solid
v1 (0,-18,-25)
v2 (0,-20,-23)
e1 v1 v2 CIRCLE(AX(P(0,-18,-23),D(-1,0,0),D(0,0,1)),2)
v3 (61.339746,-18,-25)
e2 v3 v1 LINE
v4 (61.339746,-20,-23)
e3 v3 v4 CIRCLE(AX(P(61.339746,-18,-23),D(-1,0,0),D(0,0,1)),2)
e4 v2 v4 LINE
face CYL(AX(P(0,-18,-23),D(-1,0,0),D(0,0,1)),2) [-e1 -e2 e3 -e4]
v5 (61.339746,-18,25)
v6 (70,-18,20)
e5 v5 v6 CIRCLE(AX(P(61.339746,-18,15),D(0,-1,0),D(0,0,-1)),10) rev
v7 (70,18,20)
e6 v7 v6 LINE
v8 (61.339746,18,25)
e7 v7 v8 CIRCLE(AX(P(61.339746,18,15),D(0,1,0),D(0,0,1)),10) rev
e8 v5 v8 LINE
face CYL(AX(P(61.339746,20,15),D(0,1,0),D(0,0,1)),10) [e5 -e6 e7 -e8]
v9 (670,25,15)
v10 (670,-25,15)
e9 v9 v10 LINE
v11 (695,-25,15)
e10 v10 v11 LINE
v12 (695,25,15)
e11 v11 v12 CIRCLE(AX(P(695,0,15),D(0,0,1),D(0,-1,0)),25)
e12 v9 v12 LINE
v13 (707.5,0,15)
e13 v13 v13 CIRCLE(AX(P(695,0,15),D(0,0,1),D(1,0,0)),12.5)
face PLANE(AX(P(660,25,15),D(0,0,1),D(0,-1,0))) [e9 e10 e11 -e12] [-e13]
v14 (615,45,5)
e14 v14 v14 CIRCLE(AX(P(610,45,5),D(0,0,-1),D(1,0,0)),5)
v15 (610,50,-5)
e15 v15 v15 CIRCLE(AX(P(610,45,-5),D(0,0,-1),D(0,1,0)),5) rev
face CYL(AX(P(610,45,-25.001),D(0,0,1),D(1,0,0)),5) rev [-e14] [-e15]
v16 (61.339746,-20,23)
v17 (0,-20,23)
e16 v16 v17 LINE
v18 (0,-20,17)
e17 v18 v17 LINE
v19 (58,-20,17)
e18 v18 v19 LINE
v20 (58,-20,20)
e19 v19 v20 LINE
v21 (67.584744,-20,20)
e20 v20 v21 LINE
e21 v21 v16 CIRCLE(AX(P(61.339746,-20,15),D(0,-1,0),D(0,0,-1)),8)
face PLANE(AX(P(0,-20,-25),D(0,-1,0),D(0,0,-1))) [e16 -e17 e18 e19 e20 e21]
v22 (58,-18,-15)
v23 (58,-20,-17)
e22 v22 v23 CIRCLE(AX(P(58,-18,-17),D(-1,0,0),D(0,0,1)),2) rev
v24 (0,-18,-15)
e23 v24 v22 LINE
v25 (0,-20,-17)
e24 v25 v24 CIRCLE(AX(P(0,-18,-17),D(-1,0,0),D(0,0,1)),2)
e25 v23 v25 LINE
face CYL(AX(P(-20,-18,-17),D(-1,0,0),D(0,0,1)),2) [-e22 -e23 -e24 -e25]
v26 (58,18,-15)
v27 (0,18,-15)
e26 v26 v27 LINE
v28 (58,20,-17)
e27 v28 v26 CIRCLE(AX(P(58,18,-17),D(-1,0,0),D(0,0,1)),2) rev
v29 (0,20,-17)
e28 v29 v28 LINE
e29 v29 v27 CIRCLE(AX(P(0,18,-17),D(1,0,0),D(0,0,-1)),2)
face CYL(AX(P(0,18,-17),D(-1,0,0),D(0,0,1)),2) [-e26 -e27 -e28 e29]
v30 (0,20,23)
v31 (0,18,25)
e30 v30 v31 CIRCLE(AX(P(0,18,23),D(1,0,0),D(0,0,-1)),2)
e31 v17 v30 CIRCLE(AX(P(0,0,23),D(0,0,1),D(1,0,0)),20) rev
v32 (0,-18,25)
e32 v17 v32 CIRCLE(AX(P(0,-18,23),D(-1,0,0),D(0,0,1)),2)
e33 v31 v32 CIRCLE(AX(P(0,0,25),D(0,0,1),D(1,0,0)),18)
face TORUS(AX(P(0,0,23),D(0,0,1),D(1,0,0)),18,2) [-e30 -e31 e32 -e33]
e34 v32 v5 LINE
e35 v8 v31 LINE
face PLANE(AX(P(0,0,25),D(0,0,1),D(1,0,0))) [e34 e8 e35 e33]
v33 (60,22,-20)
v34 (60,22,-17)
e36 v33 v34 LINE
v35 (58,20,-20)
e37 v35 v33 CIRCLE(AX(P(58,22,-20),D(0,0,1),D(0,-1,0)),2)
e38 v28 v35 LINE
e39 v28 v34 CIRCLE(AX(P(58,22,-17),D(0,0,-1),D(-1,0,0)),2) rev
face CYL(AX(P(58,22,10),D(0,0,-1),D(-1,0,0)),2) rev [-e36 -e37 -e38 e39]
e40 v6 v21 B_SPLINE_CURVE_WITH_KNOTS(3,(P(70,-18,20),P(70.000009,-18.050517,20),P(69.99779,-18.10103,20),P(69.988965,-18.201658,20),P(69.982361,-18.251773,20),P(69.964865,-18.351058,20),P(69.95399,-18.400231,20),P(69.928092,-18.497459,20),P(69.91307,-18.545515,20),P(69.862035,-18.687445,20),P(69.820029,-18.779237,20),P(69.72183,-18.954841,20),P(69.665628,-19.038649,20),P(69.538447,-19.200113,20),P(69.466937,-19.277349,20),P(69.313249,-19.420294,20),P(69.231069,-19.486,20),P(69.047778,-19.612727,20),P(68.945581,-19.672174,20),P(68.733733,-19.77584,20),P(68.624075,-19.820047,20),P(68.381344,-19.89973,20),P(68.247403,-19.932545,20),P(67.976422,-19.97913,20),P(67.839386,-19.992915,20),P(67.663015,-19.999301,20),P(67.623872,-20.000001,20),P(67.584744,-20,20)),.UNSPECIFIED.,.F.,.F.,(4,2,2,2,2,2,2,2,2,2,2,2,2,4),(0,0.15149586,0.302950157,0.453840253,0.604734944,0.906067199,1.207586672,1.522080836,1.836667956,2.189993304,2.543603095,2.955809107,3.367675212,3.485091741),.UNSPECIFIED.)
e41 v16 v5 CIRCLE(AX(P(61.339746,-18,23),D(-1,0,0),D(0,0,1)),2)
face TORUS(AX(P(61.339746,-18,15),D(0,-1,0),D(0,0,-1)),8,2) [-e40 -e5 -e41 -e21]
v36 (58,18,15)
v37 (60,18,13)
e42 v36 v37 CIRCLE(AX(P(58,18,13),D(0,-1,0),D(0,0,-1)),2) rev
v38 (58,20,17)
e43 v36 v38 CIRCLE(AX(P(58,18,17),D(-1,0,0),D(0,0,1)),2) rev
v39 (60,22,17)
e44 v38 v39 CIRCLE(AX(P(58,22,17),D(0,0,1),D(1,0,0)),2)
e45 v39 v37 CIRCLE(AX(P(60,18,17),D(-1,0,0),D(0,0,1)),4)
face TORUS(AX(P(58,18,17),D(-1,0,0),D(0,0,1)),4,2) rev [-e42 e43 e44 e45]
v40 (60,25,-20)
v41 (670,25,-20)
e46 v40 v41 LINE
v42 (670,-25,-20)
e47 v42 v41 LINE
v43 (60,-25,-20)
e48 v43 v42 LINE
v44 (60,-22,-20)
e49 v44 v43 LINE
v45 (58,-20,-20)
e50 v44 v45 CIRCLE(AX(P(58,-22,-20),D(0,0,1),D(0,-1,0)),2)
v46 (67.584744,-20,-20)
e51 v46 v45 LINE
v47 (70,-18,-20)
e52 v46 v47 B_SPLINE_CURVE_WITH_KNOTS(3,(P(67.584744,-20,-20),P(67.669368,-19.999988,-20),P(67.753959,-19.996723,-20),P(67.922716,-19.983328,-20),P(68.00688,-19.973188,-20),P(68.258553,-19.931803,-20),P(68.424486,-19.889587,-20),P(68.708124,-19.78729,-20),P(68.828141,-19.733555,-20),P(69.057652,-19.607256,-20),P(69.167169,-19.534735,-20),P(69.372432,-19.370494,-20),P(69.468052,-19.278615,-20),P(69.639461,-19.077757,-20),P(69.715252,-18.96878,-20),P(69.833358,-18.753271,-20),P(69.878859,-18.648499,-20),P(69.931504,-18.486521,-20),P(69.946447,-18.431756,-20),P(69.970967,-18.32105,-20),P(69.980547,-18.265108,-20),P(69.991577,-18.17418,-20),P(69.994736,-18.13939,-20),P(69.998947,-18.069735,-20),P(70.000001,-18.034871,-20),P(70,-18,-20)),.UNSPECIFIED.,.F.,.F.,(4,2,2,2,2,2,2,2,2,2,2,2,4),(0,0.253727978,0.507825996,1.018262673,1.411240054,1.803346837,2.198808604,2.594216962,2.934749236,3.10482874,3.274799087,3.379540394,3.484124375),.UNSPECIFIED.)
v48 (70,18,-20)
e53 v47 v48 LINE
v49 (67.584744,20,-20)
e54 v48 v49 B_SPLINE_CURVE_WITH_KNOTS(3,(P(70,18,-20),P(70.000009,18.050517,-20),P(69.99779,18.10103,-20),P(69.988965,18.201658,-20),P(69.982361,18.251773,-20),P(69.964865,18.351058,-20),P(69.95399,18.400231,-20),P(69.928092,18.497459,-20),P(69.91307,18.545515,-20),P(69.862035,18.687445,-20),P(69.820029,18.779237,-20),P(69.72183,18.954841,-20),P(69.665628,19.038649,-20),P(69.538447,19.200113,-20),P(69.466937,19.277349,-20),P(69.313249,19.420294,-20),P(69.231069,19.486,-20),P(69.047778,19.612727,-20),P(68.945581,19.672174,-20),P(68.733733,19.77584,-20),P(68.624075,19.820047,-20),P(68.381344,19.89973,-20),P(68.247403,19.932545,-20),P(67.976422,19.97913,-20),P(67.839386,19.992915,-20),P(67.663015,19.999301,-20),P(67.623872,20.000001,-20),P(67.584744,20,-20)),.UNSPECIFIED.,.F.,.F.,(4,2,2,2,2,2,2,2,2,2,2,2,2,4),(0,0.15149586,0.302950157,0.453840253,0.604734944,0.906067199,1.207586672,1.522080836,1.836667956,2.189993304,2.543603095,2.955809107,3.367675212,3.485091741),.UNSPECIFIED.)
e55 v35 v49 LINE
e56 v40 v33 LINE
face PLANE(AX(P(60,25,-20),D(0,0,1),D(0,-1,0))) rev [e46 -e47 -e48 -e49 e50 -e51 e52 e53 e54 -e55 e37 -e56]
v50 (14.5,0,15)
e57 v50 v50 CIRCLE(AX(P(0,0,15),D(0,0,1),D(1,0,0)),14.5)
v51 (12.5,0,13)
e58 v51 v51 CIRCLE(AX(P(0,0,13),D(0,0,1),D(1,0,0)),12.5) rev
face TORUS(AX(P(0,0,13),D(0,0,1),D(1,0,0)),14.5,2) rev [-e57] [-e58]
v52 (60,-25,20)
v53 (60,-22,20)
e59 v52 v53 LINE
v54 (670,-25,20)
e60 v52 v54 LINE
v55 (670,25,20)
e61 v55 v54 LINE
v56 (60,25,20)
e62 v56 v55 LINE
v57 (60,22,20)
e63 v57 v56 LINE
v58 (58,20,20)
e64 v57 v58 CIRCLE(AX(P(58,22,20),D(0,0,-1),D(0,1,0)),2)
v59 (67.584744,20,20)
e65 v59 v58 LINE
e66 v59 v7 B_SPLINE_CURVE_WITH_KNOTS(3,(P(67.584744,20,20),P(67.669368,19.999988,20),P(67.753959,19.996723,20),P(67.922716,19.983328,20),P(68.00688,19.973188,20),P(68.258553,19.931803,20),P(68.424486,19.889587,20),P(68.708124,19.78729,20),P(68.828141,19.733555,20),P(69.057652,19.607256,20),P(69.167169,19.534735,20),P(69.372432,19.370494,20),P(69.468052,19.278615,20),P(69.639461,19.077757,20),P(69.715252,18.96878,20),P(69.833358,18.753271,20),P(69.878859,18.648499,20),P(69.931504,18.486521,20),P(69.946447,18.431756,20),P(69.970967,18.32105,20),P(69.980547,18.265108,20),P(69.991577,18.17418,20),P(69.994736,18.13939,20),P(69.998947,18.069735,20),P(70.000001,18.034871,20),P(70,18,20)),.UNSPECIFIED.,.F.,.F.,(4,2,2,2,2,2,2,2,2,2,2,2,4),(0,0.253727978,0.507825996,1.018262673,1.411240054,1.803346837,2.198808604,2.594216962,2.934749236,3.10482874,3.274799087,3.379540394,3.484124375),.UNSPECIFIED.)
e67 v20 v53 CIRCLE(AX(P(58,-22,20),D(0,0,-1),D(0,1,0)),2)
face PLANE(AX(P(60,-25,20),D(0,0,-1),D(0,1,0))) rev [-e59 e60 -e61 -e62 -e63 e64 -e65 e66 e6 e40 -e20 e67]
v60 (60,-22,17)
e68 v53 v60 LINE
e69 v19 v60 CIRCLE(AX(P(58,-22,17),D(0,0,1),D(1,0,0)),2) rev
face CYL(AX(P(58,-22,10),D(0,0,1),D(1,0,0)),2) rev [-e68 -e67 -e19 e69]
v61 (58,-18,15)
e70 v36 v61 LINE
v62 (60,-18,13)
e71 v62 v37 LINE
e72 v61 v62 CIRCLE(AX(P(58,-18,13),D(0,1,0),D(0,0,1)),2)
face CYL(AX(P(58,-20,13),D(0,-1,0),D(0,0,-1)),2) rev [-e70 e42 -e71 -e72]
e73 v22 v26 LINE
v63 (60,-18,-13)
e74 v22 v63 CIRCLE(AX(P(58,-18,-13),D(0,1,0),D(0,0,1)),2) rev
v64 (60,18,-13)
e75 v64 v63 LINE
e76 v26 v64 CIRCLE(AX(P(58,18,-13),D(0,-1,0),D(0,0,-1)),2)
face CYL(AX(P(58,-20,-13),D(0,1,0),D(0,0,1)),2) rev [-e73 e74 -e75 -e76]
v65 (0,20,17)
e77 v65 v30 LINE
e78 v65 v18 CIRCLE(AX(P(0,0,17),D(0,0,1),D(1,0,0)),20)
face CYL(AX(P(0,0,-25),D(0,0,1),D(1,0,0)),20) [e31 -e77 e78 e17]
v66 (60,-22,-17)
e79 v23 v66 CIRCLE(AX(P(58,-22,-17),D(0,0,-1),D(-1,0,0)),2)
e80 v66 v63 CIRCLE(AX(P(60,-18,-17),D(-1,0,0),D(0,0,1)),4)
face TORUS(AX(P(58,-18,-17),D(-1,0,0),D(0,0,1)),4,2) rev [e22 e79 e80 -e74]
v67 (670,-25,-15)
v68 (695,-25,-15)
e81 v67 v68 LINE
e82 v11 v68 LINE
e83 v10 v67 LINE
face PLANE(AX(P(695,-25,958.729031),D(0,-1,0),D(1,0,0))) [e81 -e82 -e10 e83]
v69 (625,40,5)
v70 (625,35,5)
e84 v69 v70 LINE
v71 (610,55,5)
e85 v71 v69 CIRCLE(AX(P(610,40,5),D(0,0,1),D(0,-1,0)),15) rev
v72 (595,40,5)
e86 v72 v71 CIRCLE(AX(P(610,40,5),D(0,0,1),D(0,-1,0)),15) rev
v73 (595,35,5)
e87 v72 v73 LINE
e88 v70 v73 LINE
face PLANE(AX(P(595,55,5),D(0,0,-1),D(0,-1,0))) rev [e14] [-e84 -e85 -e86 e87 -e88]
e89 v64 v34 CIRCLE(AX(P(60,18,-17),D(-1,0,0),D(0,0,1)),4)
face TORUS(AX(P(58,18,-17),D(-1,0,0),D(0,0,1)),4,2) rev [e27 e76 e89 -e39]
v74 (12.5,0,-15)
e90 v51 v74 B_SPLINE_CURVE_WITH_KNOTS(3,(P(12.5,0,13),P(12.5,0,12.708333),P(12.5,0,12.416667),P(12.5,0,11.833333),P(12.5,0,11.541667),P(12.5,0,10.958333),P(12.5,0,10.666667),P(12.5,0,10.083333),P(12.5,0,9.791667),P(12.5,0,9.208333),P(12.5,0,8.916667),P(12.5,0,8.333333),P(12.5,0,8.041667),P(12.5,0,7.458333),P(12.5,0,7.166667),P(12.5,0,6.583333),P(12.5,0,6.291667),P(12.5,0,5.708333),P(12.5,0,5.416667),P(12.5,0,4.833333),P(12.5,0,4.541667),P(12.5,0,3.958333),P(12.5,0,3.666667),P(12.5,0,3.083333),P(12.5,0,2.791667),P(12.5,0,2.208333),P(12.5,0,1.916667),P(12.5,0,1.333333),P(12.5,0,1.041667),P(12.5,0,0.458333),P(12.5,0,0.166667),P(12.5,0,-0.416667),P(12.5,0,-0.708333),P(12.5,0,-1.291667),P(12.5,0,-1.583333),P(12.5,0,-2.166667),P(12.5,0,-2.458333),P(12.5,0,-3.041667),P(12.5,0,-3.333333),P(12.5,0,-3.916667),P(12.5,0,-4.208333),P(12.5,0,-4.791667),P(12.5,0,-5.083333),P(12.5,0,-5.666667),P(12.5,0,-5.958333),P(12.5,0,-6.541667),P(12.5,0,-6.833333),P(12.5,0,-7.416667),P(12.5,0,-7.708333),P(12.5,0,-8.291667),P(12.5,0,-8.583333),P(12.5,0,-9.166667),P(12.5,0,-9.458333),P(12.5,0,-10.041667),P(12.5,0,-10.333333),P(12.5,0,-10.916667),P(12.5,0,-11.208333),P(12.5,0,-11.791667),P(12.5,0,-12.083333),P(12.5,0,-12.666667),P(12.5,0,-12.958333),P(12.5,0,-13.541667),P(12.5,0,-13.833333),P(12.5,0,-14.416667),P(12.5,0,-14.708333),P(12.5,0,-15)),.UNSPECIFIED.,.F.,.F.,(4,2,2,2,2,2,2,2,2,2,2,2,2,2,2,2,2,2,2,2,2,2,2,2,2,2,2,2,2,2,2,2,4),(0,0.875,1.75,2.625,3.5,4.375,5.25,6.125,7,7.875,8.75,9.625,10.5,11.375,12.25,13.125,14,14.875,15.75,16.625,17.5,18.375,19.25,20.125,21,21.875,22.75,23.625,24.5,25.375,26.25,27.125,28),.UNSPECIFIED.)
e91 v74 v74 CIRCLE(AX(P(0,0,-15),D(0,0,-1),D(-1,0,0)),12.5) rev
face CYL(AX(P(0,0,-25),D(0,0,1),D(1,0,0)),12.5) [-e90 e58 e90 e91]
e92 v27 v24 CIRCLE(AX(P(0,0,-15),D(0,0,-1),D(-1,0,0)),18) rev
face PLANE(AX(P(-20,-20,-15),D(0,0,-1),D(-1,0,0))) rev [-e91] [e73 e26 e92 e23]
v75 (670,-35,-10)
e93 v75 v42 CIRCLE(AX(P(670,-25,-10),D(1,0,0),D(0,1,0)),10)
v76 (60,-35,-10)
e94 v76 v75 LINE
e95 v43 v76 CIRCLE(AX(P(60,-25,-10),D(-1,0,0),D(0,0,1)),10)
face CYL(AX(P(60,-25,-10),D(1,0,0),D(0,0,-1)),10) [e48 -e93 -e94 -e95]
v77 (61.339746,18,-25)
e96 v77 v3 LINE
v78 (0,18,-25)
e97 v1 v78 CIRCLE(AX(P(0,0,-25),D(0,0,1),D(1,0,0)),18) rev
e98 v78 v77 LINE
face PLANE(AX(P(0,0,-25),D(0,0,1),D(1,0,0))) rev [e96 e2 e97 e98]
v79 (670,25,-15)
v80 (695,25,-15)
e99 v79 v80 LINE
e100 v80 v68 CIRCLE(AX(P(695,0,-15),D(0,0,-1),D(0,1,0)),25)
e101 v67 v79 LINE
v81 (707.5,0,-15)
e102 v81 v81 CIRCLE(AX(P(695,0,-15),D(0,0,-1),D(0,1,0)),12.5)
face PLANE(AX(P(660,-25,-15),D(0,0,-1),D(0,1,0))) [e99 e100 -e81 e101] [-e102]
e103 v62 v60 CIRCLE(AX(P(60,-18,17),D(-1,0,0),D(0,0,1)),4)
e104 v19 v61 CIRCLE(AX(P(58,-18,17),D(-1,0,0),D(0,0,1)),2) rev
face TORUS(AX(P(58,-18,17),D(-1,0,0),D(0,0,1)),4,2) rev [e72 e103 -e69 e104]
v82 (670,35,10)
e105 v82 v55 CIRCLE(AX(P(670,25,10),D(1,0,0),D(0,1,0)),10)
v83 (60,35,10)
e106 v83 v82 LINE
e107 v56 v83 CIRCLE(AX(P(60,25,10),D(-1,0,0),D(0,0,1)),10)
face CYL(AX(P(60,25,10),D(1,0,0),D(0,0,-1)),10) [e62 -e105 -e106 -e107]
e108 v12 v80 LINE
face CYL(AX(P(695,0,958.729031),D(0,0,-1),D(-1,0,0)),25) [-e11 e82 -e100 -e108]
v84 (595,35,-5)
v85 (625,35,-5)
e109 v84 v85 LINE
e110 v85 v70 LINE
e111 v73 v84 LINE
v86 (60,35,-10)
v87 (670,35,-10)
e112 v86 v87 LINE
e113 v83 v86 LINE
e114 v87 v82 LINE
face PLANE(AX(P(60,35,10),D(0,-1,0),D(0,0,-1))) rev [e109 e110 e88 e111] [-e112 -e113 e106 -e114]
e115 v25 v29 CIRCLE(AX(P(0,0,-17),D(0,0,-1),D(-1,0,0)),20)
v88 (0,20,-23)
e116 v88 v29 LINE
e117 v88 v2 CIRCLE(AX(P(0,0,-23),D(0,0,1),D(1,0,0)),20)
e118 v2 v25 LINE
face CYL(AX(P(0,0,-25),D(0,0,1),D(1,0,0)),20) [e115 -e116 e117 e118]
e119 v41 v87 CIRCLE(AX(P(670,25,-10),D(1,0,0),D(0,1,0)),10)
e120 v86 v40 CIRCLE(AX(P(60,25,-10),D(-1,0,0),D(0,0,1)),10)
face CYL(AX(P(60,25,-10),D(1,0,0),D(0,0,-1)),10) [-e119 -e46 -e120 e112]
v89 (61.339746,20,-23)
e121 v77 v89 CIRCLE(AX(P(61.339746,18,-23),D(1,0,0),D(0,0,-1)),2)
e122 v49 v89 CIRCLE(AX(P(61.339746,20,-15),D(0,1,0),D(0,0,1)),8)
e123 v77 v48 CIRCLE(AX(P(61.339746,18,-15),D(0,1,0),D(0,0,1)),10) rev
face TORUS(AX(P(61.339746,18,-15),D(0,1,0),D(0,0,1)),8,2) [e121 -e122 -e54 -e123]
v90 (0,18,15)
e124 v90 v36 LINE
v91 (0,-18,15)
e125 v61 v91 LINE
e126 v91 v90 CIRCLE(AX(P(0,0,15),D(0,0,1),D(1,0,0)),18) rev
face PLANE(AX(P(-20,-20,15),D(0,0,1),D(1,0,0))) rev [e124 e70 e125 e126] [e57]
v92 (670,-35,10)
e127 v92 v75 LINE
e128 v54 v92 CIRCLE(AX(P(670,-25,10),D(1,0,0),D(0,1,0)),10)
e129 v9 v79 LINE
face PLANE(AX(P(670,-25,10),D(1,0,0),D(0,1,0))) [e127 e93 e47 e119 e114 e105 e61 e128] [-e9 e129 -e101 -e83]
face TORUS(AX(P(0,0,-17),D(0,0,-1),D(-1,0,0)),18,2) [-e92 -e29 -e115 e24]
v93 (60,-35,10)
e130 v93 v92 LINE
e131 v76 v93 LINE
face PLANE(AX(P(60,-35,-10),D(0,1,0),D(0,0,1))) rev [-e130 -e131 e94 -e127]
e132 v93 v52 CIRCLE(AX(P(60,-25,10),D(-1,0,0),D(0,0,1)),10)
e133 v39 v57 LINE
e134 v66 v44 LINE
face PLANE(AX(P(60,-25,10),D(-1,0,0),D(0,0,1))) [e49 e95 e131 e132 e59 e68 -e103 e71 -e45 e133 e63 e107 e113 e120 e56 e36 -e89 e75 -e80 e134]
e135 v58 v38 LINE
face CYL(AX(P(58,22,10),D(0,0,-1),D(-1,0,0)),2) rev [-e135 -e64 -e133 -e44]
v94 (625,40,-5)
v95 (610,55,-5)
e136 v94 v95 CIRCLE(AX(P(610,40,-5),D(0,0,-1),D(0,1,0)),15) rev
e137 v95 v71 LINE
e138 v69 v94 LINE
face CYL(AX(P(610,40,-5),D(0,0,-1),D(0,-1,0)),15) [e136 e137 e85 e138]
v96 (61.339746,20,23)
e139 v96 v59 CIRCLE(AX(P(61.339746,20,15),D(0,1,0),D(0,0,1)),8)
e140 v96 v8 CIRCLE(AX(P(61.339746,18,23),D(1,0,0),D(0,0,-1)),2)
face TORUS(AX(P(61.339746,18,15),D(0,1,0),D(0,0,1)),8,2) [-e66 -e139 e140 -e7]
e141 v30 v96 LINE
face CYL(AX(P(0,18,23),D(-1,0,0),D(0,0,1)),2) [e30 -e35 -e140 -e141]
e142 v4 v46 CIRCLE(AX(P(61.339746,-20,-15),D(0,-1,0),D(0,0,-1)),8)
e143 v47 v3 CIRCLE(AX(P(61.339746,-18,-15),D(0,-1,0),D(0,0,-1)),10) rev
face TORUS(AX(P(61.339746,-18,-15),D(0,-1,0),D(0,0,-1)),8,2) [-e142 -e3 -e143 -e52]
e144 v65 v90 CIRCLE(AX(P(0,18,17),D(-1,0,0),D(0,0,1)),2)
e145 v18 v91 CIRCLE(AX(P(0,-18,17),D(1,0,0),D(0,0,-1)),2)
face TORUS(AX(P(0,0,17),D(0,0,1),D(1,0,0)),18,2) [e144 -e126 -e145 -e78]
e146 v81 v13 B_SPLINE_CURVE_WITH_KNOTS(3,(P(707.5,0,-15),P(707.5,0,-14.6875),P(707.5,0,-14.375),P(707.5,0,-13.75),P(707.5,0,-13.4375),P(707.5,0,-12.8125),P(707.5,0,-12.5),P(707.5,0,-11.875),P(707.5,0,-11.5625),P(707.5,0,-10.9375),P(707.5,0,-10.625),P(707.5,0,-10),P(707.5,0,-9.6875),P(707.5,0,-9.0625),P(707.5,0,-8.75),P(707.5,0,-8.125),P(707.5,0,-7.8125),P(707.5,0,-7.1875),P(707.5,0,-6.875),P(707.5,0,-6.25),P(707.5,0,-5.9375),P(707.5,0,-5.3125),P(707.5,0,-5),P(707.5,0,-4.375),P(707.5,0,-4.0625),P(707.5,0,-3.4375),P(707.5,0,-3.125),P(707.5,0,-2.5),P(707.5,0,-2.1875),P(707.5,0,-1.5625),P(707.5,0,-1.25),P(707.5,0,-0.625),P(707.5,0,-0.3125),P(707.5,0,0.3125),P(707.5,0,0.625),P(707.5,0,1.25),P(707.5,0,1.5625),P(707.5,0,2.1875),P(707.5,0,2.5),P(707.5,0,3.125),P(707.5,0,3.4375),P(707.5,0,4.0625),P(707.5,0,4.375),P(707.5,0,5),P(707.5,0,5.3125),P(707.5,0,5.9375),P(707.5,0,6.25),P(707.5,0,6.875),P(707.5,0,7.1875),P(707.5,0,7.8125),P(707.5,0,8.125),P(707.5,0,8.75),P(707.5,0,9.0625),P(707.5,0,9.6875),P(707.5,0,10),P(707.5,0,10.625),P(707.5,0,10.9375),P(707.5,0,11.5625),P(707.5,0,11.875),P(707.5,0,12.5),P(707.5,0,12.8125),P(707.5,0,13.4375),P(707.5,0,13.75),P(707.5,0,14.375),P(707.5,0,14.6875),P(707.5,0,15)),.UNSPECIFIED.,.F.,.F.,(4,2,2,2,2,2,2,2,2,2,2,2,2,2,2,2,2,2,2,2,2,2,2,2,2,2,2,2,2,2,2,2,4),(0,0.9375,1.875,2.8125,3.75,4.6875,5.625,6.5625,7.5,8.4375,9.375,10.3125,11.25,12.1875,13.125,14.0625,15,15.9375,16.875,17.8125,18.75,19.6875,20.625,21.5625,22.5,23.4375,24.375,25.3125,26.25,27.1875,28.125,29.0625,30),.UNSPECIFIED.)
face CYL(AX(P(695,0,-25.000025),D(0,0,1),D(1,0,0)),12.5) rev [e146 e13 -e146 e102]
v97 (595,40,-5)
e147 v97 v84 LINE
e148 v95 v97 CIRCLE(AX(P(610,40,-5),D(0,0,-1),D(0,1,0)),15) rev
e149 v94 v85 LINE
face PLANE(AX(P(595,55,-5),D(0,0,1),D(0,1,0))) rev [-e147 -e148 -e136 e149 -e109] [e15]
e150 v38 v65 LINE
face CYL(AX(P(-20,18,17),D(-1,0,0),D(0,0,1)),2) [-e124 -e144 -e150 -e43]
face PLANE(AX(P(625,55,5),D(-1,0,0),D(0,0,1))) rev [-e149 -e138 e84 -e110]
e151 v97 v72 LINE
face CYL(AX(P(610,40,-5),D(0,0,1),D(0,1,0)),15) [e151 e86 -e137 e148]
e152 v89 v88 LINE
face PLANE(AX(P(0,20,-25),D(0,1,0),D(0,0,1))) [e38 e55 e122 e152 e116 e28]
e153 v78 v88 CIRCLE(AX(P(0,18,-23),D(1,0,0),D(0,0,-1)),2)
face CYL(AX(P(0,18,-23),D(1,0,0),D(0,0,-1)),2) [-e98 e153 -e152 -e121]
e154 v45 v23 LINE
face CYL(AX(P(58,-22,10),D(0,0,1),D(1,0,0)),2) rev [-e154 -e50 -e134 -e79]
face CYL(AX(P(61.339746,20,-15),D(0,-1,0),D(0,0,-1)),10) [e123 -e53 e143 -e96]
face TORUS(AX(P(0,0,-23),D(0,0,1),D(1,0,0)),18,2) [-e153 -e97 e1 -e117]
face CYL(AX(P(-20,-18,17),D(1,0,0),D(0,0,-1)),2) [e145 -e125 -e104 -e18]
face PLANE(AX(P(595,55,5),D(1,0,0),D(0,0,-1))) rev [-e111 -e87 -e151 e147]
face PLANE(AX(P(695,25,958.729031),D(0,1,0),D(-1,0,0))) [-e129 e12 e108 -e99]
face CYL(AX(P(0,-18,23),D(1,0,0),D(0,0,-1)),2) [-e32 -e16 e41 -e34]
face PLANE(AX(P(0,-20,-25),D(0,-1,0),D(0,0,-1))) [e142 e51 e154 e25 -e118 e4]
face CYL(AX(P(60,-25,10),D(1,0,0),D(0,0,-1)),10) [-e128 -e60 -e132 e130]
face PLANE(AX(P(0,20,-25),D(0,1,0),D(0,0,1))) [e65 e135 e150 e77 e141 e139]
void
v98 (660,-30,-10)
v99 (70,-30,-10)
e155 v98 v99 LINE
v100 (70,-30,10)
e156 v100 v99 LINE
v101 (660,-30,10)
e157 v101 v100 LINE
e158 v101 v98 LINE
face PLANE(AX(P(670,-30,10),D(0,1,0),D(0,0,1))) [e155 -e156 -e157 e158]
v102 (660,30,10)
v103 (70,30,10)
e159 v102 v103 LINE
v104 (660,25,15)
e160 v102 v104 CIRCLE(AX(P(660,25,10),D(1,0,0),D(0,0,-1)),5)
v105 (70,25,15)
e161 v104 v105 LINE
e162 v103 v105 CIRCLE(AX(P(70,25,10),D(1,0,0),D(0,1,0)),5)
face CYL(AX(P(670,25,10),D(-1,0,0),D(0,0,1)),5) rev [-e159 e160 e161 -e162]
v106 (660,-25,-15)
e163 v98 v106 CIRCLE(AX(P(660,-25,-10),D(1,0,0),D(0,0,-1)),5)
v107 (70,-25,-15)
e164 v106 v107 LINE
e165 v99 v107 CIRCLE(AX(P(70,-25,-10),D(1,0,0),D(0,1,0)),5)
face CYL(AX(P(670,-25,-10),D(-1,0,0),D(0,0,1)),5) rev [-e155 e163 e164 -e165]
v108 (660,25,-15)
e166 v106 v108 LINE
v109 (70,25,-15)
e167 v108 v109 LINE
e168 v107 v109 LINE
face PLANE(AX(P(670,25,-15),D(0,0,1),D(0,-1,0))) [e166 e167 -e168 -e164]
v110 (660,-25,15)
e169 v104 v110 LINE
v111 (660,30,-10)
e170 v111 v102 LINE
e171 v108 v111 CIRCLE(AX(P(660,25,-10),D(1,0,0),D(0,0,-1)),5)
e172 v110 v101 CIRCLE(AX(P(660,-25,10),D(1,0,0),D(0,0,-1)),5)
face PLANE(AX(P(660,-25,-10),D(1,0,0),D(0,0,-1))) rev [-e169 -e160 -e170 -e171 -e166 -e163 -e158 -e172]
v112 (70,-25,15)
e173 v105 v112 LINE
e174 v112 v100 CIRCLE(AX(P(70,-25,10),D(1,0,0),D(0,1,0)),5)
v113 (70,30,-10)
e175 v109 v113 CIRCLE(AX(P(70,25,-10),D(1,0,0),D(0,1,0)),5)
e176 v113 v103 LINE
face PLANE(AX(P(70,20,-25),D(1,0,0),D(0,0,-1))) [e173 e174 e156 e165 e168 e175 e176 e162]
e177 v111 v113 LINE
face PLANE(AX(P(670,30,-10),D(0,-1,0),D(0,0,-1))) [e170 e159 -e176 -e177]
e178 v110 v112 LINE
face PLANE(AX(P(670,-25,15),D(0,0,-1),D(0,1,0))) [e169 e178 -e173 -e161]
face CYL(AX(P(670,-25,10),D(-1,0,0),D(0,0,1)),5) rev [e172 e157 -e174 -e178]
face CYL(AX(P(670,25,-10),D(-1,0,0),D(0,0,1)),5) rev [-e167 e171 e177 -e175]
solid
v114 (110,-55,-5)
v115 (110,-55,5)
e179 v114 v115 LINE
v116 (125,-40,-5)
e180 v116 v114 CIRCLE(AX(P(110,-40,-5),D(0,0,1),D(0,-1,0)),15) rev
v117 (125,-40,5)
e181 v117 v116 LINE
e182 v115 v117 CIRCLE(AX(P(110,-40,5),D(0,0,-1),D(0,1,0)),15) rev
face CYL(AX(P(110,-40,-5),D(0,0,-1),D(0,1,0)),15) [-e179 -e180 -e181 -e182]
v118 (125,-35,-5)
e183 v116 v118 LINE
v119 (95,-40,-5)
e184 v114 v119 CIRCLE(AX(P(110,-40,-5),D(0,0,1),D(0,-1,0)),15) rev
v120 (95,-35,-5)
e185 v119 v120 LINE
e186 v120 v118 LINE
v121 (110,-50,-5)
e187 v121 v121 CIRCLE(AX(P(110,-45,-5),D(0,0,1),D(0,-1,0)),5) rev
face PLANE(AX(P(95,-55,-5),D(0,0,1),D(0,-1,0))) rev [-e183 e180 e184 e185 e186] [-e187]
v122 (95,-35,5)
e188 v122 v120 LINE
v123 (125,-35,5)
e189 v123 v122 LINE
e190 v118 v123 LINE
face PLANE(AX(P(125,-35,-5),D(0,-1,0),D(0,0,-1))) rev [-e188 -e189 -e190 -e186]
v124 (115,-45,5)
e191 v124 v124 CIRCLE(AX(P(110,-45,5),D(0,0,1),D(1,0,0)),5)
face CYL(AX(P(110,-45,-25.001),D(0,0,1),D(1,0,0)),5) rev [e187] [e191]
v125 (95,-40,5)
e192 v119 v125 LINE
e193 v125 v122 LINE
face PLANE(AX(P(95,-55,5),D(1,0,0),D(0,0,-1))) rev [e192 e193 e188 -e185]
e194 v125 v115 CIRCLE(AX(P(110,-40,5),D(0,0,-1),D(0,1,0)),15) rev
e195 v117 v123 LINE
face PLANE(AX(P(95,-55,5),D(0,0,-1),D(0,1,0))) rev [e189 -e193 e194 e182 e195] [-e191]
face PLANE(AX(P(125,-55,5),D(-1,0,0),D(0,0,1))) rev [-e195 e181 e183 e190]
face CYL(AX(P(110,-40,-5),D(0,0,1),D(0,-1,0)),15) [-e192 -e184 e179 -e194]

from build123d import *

# Parameters (mm, degrees)
BOSS_EXTRUDE1_DEPTH      = 25
BOSS_EXTRUDE1_DEPTH_BACK = 25
SKETCH2_W                = 30
SKETCH2_H                = 40
CUT_EXTRUDE1_DEPTH       = 96.524865873
BOSS_EXTRUDE2_REACH      = 90.318
SKETCH3_R                = 12.5
STRUCTURAL_MEMBER1_DEPTH = 600
BOSS_EXTRUDE3_DEPTH      = 10
BOSS_EXTRUDE4_DEPTH      = 50
BOSS_EXTRUDE4_DEPTH_BACK = 10
CUT_EXTRUDE6_START       = -30
CUT_EXTRUDE6_DEPTH       = 30
SKETCH16_R               = 12.5
CUT_EXTRUDE7_DEPTH       = 722.959140118
FILLET1_R                = 10
FILLET2_R                = 2
FILLET3_R                = 2
SKETCH19_W               = 30
SKETCH19_H               = 10
BOSS_EXTRUDE6_DEPTH      = 20
FILLET5_R                = 15
SKETCH20_R               = 5
CUT_EXTRUDE9_DEPTH       = 10
LPATTERN1_COUNT          = 2
LPATTERN1_PITCH          = 500
FILLET5_OF_LPATTERN1_R   = 15
MIRROR1_START            = -5
MIRROR1_OUTLINE_R        = 5
MIRROR1_DEPTH            = 10
CUT_EXTRUDE10_START      = -25
CUT_EXTRUDE10_OUTLINE_R  = 5
CUT_EXTRUDE10_DEPTH      = 10
CUT_EXTRUDE11_DEPTH      = 724.498445063
CUT_EXTRUDE11_DEPTH_BACK = 724.498445063


# Read off the part's stored shape, not the designer's step: Cut-Extrude6, Mirror1, Cut-Extrude10
# Some blends are built 0.0001 mm under size
with BuildPart() as part:
    # Sketch1 → Boss-Extrude1 (new, two sides: drawn at the far end of the back side and taken through both)
    with BuildSketch(Plane.XY.offset(-BOSS_EXTRUDE1_DEPTH_BACK)):
        with BuildLine():
            Line((0, 20), (70, 20))
            Line((70, 20), (70, -20))
            Line((70, -20), (0, -20))
            ThreePointArc((0, -20), (-20, 0), (0, 20))
        make_face()
    extrude(amount=BOSS_EXTRUDE1_DEPTH + BOSS_EXTRUDE1_DEPTH_BACK)

    # Sketch2 → Cut-Extrude1 (cut, through all)
    with BuildSketch(Plane(origin=(70, 0, 0), x_dir=(0, 0, -1), z_dir=(1, 0, 0))):
        Rectangle(SKETCH2_W, SKETCH2_H)
    extrude(amount=-CUT_EXTRUDE1_DEPTH, mode=Mode.SUBTRACT)


with BuildPart() as cut_extrude1_piece_1:
    # of the separate pieces the step leaves, piece 1, a body of its own (cut_extrude1_pieces)
    add(part.part.solids().sort_by_distance((0, 20, -25))[0])

    # Sketch3 → Boss-Extrude2 (add, up to next)
    with BuildSketch(Plane.XY.offset(25), mode=Mode.PRIVATE) as boss_extrude2_sk1:
        Circle(SKETCH3_R)
    boss_extrude2_tool1 = extrude(boss_extrude2_sk1.sketch, amount=-BOSS_EXTRUDE2_REACH, mode=Mode.PRIVATE) - cut_extrude1_piece_1.part


with BuildPart() as cut_extrude1_piece_2:
    # of the separate pieces the step leaves, piece 2, a body of its own (cut_extrude1_pieces)
    add(part.part.solids().sort_by_distance((0, 20, 15))[0])


with BuildPart() as cut_extrude1_piece_1_1:
    add(cut_extrude1_piece_1.part)

    add(cut_extrude1_piece_2.part)  # Boss-Extrude2 merges Cut-Extrude1 piece 2
    add(boss_extrude2_tool1.solids().sort_by_distance((0, 0, 25))[0])



with BuildPart() as body_2:
    # Sketch11 → Structural Member1 (new body)
    with BuildSketch(Plane(origin=(70, 0, 0), x_dir=(0, 0, 1), z_dir=(1, 0, 0))):
        with BuildLine():
            Line((-10, -35), (10, -35))
            ThreePointArc((10, -35), (17.071067812, -32.071067812), (20, -25))
            Line((20, -25), (20, 25))
            ThreePointArc((20, 25), (17.071067812, 32.071067812), (10, 35))
            Line((10, 35), (-10, 35))
            ThreePointArc((-10, 35), (-17.071067812, 32.071067812), (-20, 25))
            Line((-20, 25), (-20, -25))
            ThreePointArc((-20, -25), (-17.071067812, -32.071067812), (-10, -35))
        make_face()
        with BuildLine():
            Line((-10, -30), (10, -30))
            ThreePointArc((10, -30), (13.535533906, -28.535533906), (15, -25))
            Line((15, -25), (15, 25))
            ThreePointArc((15, 25), (13.535533906, 28.535533906), (10, 30))
            Line((10, 30), (-10, 30))
            ThreePointArc((-10, 30), (-13.535533906, 28.535533906), (-15, 25))
            Line((-15, 25), (-15, -25))
            ThreePointArc((-15, -25), (-13.535533906, -28.535533906), (-10, -30))
        make_face(mode=Mode.SUBTRACT)
    extrude(amount=STRUCTURAL_MEMBER1_DEPTH)


with BuildPart() as cut_extrude1_piece_1_2:
    add(cut_extrude1_piece_1_1.part)

    add(body_2.part)  # Boss-Extrude3 merges body 2
    # Sketch12 → Boss-Extrude3 (add)
    with BuildSketch(Plane.ZY.offset(-70)):
        with BuildLine():
            Line((20, -25), (20, 25))
            ThreePointArc((20, 25), (17.071067812, 32.071067812), (10, 35))
            Line((10, 35), (-10, 35))
            ThreePointArc((-10, 35), (-17.071067812, 32.071067812), (-20, 25))
            Line((-20, 25), (-20, -25))
            ThreePointArc((-20, -25), (-17.071067812, -32.071067812), (-10, -35))
            Line((-10, -35), (10, -35))
            ThreePointArc((10, -35), (17.071067812, -32.071067812), (20, -25))
        make_face()
    extrude(amount=BOSS_EXTRUDE3_DEPTH)

    # Sketch14 → Boss-Extrude4 (add, two sides: drawn at the far end of the back side and taken through both)
    with BuildSketch(Plane(origin=(670, 0, 0), x_dir=(0, 0, -1), z_dir=(1, 0, 0)).offset(-BOSS_EXTRUDE4_DEPTH_BACK)):
        with BuildLine():
            Line((15, -25), (15, 25))
            ThreePointArc((15, 25), (13.535533906, 28.535533906), (10, 30))
            Line((10, 30), (-10, 30))
            ThreePointArc((-10, 30), (-13.535533906, 28.535533906), (-15, 25))
            Line((-15, 25), (-15, -25))
            ThreePointArc((-15, -25), (-13.535533906, -28.535533906), (-10, -30))
            Line((-10, -30), (10, -30))
            ThreePointArc((10, -30), (13.535533906, -28.535533906), (15, -25))
        make_face()
    extrude(amount=BOSS_EXTRUDE4_DEPTH + BOSS_EXTRUDE4_DEPTH_BACK)

    # Cut-Extrude6 outline → Cut-Extrude6 (cut)
    with BuildSketch(Plane.XY.offset(15).offset(CUT_EXTRUDE6_START)):
        with BuildLine():
            Line((670, -25), (670, -30))
            Line((670, -30), (720, -30))
            Line((720, -30), (720, 1.37e-07))
            ThreePointArc((720, 1.37e-07), (712.677669578, -17.677669481), (695, -25))
            Line((695, -25), (670, -25))
        make_face()
        with BuildLine():
            Line((670, 30), (670, 25))
            Line((670, 25), (695, 25))
            ThreePointArc((695, 25), (712.677669481, 17.677669578), (720, 1.37e-07))
            Line((720, 1.37e-07), (720, 30))
            Line((720, 30), (670, 30))
        make_face()
    extrude(amount=CUT_EXTRUDE6_DEPTH, mode=Mode.SUBTRACT)

    # Sketch16 → Cut-Extrude7 (cut, through all)
    with BuildSketch(Plane.XY.offset(15)):
        with Locations((695, 0)):
            Circle(SKETCH16_R)
    extrude(amount=-CUT_EXTRUDE7_DEPTH, mode=Mode.SUBTRACT)

    # Fillet1
    # the kernel refuses this fillet: 10 mm, written as the material it takes off along each edge
    with BuildSketch(Plane(origin=(70, 41.650635095, -25), x_dir=(0, 0, 1), z_dir=(0, -1, 0))) as fillet1_piece_1:
        with BuildLine():
            CenterArc((10, 8.660254038), FILLET1_R, 180, 60)
            Line((0, 8.660254038), (-0.2, 8.660254038))
            Line((-0.2, 8.660254038), (-0.2, 0))
            Line((-0.2, 0), (0, -0.2))
            ThreePointArc((0, -0.2), (2.5, -0.2), (4.9, -0.173205081))
            Line((4.9, -0.173205081), (5, 0))
        make_face()
    extrude(amount=83.301270189, mode=Mode.SUBTRACT)
    with BuildSketch(Plane(origin=(70, 41.650635095, 25), x_dir=(0, 0, -1), z_dir=(0, -1, 0))) as fillet1_piece_2:
        with BuildLine():
            CenterArc((10, -8.660254038), FILLET1_R, 120, 60)
            Line((0, -8.660254038), (-0.2, -8.660254038))
            Line((-0.2, -8.660254038), (-0.2, 0))
            Line((-0.2, 0), (0, 0.2))
            ThreePointArc((0, 0.2), (2.5, 0.2), (4.9, 0.173205081))
            Line((4.9, 0.173205081), (5, 0))
        make_face()
    extrude(amount=83.301270189, mode=Mode.SUBTRACT)

    # Fillet2
    fillet2_edges = [cut_extrude1_piece_1_2.edges().sort_by_distance(p)[0] for p in [
        (-12.5, 0, 15),
        (30, 20, -15),
        (-20, 0, -15),
        (30, -20, -15),
        (-20, 0, 15),
        (30, 20, 15),
        (60, 0, -15),
        (30, -20, 15),
        (60, 0, 15),
        (60, 20, 17.5),
        (60, 20, -17.5),
        (60, -20, -17.5),
        (60, -20, 17.5),
    ]]
    fillet(fillet2_edges, radius=FILLET2_R)

    # Fillet3
    fillet3_edges = [cut_extrude1_piece_1_2.edges().sort_by_distance(p)[0] for p in [
        (66.339745962, 20, 23.660254038),
        (30.669872981, 20, 25),
        (-20, 0, 25),
        (66.339745962, -20, 23.660254038),
        (66.339745962, 20, -23.660254038),
        (30.669872981, 20, -25),
        (-20, 0, -25),
        (66.339745962, -20, -23.660254038),
        (30.669872981, -20, 25),
        (30.669872981, -20, -25),
    ]]
    fillet(fillet3_edges, radius=FILLET3_R)


with BuildPart() as body_2_2:
    # Sketch19 → Boss-Extrude6 (new body)
    with BuildSketch(Plane.XZ.offset(35)):
        with Locations((110, 0)):
            Rectangle(SKETCH19_W, SKETCH19_H)
    boss_extrude6 = extrude(amount=BOSS_EXTRUDE6_DEPTH)

    # Fillet5
    fillet5_edges = [body_2_2.edges().sort_by_distance(p)[0] for p in [
        (95, -55, 0),
        (125, -55, 0),
    ]]
    fillet(fillet5_edges, radius=FILLET5_R - 0.0001)  # a hair under: the kernel refuses the full size

    # Sketch20 → Cut-Extrude9 (cut)
    with BuildSketch(Plane.XY.offset(5)):
        with Locations((110, -45)):
            Circle(SKETCH20_R)
    cut_extrude9 = extrude(amount=-CUT_EXTRUDE9_DEPTH, mode=Mode.SUBTRACT)


with BuildPart() as cut_extrude1_piece_1_3:
    add(cut_extrude1_piece_1_2.part)

    # LPattern1: Boss-Extrude6, Cut-Extrude9 ×2
    with Locations(*[(i * LPATTERN1_PITCH, 0, 0) for i in range(1, LPATTERN1_COUNT)]):
        add(boss_extrude6)
        add(cut_extrude9, mode=Mode.SUBTRACT)

    # Fillet5 of LPattern1
    fillet5_of_lpattern1_edges = [cut_extrude1_piece_1_3.edges().sort_by_distance(p)[0] for p in [
        (595, -55, 0),
        (625, -55, 0),
    ]]
    fillet(fillet5_of_lpattern1_edges, radius=FILLET5_OF_LPATTERN1_R - 0.0001)  # a hair under: the kernel refuses the full size

    # Mirror1 outline → Mirror1 (add)
    # profile 1 of 2: a face of its own
    with BuildSketch(Plane.XY.offset(MIRROR1_START)):
        with BuildLine():
            Line((595, 40), (595, 35))
            Line((595, 35), (625, 35))
            Line((625, 35), (625, 40))
            ThreePointArc((625, 40), (620.606601718, 50.606601718), (610, 55))
            ThreePointArc((610, 55), (599.393398282, 50.606601718), (595, 40))
        make_face()
        with Locations((610, 45)):
            Circle(MIRROR1_OUTLINE_R, mode=Mode.SUBTRACT)
    # profile 2 of 2: a face of its own
    with BuildSketch(Plane.XY.offset(MIRROR1_START)):
        with BuildLine():
            Line((125, 35), (125, 40))
            ThreePointArc((125, 40), (120.606601718, 50.606601718), (110, 55))
            ThreePointArc((110, 55), (99.393398282, 50.606601718), (95, 40))
            Line((95, 40), (95, 35))
            Line((95, 35), (125, 35))
        make_face()
        with Locations((110, 45)):
            Circle(MIRROR1_OUTLINE_R, mode=Mode.SUBTRACT)
    extrude(amount=MIRROR1_DEPTH)

    # Cut-Extrude10 outline → Cut-Extrude10 (cut)
    with BuildSketch(Plane.XY.offset(20).offset(CUT_EXTRUDE10_START)):
        with BuildLine():
            Line((95, 40), (95, 35))
            Line((95, 35), (125, 35))
            Line((125, 35), (125, 40))
            ThreePointArc((125, 40), (120.606601718, 50.606601718), (110, 55))
            ThreePointArc((110, 55), (99.393398282, 50.606601718), (95, 40))
        make_face()
        with Locations((110, 45)):
            Circle(CUT_EXTRUDE10_OUTLINE_R, mode=Mode.SUBTRACT)
    extrude(amount=CUT_EXTRUDE10_DEPTH, mode=Mode.SUBTRACT)

    # Sketch22 → Cut-Extrude11 (cut, two sides: drawn at the far end of the back side and taken through both)
    with BuildSketch(Plane.XY.offset(20).offset(-CUT_EXTRUDE11_DEPTH_BACK)):
        Polygon((1937.497600964, -35), (625, -35), (594.75712703, -35), (-717.740473933, -35), (-717.740473933, -2659.995201927), (1937.497600964, -2659.995201927), align=None)
    extrude(amount=CUT_EXTRUDE11_DEPTH + CUT_EXTRUDE11_DEPTH_BACK, mode=Mode.SUBTRACT)


solid = Compound([body_2_2.part, cut_extrude1_piece_1_3.part])
